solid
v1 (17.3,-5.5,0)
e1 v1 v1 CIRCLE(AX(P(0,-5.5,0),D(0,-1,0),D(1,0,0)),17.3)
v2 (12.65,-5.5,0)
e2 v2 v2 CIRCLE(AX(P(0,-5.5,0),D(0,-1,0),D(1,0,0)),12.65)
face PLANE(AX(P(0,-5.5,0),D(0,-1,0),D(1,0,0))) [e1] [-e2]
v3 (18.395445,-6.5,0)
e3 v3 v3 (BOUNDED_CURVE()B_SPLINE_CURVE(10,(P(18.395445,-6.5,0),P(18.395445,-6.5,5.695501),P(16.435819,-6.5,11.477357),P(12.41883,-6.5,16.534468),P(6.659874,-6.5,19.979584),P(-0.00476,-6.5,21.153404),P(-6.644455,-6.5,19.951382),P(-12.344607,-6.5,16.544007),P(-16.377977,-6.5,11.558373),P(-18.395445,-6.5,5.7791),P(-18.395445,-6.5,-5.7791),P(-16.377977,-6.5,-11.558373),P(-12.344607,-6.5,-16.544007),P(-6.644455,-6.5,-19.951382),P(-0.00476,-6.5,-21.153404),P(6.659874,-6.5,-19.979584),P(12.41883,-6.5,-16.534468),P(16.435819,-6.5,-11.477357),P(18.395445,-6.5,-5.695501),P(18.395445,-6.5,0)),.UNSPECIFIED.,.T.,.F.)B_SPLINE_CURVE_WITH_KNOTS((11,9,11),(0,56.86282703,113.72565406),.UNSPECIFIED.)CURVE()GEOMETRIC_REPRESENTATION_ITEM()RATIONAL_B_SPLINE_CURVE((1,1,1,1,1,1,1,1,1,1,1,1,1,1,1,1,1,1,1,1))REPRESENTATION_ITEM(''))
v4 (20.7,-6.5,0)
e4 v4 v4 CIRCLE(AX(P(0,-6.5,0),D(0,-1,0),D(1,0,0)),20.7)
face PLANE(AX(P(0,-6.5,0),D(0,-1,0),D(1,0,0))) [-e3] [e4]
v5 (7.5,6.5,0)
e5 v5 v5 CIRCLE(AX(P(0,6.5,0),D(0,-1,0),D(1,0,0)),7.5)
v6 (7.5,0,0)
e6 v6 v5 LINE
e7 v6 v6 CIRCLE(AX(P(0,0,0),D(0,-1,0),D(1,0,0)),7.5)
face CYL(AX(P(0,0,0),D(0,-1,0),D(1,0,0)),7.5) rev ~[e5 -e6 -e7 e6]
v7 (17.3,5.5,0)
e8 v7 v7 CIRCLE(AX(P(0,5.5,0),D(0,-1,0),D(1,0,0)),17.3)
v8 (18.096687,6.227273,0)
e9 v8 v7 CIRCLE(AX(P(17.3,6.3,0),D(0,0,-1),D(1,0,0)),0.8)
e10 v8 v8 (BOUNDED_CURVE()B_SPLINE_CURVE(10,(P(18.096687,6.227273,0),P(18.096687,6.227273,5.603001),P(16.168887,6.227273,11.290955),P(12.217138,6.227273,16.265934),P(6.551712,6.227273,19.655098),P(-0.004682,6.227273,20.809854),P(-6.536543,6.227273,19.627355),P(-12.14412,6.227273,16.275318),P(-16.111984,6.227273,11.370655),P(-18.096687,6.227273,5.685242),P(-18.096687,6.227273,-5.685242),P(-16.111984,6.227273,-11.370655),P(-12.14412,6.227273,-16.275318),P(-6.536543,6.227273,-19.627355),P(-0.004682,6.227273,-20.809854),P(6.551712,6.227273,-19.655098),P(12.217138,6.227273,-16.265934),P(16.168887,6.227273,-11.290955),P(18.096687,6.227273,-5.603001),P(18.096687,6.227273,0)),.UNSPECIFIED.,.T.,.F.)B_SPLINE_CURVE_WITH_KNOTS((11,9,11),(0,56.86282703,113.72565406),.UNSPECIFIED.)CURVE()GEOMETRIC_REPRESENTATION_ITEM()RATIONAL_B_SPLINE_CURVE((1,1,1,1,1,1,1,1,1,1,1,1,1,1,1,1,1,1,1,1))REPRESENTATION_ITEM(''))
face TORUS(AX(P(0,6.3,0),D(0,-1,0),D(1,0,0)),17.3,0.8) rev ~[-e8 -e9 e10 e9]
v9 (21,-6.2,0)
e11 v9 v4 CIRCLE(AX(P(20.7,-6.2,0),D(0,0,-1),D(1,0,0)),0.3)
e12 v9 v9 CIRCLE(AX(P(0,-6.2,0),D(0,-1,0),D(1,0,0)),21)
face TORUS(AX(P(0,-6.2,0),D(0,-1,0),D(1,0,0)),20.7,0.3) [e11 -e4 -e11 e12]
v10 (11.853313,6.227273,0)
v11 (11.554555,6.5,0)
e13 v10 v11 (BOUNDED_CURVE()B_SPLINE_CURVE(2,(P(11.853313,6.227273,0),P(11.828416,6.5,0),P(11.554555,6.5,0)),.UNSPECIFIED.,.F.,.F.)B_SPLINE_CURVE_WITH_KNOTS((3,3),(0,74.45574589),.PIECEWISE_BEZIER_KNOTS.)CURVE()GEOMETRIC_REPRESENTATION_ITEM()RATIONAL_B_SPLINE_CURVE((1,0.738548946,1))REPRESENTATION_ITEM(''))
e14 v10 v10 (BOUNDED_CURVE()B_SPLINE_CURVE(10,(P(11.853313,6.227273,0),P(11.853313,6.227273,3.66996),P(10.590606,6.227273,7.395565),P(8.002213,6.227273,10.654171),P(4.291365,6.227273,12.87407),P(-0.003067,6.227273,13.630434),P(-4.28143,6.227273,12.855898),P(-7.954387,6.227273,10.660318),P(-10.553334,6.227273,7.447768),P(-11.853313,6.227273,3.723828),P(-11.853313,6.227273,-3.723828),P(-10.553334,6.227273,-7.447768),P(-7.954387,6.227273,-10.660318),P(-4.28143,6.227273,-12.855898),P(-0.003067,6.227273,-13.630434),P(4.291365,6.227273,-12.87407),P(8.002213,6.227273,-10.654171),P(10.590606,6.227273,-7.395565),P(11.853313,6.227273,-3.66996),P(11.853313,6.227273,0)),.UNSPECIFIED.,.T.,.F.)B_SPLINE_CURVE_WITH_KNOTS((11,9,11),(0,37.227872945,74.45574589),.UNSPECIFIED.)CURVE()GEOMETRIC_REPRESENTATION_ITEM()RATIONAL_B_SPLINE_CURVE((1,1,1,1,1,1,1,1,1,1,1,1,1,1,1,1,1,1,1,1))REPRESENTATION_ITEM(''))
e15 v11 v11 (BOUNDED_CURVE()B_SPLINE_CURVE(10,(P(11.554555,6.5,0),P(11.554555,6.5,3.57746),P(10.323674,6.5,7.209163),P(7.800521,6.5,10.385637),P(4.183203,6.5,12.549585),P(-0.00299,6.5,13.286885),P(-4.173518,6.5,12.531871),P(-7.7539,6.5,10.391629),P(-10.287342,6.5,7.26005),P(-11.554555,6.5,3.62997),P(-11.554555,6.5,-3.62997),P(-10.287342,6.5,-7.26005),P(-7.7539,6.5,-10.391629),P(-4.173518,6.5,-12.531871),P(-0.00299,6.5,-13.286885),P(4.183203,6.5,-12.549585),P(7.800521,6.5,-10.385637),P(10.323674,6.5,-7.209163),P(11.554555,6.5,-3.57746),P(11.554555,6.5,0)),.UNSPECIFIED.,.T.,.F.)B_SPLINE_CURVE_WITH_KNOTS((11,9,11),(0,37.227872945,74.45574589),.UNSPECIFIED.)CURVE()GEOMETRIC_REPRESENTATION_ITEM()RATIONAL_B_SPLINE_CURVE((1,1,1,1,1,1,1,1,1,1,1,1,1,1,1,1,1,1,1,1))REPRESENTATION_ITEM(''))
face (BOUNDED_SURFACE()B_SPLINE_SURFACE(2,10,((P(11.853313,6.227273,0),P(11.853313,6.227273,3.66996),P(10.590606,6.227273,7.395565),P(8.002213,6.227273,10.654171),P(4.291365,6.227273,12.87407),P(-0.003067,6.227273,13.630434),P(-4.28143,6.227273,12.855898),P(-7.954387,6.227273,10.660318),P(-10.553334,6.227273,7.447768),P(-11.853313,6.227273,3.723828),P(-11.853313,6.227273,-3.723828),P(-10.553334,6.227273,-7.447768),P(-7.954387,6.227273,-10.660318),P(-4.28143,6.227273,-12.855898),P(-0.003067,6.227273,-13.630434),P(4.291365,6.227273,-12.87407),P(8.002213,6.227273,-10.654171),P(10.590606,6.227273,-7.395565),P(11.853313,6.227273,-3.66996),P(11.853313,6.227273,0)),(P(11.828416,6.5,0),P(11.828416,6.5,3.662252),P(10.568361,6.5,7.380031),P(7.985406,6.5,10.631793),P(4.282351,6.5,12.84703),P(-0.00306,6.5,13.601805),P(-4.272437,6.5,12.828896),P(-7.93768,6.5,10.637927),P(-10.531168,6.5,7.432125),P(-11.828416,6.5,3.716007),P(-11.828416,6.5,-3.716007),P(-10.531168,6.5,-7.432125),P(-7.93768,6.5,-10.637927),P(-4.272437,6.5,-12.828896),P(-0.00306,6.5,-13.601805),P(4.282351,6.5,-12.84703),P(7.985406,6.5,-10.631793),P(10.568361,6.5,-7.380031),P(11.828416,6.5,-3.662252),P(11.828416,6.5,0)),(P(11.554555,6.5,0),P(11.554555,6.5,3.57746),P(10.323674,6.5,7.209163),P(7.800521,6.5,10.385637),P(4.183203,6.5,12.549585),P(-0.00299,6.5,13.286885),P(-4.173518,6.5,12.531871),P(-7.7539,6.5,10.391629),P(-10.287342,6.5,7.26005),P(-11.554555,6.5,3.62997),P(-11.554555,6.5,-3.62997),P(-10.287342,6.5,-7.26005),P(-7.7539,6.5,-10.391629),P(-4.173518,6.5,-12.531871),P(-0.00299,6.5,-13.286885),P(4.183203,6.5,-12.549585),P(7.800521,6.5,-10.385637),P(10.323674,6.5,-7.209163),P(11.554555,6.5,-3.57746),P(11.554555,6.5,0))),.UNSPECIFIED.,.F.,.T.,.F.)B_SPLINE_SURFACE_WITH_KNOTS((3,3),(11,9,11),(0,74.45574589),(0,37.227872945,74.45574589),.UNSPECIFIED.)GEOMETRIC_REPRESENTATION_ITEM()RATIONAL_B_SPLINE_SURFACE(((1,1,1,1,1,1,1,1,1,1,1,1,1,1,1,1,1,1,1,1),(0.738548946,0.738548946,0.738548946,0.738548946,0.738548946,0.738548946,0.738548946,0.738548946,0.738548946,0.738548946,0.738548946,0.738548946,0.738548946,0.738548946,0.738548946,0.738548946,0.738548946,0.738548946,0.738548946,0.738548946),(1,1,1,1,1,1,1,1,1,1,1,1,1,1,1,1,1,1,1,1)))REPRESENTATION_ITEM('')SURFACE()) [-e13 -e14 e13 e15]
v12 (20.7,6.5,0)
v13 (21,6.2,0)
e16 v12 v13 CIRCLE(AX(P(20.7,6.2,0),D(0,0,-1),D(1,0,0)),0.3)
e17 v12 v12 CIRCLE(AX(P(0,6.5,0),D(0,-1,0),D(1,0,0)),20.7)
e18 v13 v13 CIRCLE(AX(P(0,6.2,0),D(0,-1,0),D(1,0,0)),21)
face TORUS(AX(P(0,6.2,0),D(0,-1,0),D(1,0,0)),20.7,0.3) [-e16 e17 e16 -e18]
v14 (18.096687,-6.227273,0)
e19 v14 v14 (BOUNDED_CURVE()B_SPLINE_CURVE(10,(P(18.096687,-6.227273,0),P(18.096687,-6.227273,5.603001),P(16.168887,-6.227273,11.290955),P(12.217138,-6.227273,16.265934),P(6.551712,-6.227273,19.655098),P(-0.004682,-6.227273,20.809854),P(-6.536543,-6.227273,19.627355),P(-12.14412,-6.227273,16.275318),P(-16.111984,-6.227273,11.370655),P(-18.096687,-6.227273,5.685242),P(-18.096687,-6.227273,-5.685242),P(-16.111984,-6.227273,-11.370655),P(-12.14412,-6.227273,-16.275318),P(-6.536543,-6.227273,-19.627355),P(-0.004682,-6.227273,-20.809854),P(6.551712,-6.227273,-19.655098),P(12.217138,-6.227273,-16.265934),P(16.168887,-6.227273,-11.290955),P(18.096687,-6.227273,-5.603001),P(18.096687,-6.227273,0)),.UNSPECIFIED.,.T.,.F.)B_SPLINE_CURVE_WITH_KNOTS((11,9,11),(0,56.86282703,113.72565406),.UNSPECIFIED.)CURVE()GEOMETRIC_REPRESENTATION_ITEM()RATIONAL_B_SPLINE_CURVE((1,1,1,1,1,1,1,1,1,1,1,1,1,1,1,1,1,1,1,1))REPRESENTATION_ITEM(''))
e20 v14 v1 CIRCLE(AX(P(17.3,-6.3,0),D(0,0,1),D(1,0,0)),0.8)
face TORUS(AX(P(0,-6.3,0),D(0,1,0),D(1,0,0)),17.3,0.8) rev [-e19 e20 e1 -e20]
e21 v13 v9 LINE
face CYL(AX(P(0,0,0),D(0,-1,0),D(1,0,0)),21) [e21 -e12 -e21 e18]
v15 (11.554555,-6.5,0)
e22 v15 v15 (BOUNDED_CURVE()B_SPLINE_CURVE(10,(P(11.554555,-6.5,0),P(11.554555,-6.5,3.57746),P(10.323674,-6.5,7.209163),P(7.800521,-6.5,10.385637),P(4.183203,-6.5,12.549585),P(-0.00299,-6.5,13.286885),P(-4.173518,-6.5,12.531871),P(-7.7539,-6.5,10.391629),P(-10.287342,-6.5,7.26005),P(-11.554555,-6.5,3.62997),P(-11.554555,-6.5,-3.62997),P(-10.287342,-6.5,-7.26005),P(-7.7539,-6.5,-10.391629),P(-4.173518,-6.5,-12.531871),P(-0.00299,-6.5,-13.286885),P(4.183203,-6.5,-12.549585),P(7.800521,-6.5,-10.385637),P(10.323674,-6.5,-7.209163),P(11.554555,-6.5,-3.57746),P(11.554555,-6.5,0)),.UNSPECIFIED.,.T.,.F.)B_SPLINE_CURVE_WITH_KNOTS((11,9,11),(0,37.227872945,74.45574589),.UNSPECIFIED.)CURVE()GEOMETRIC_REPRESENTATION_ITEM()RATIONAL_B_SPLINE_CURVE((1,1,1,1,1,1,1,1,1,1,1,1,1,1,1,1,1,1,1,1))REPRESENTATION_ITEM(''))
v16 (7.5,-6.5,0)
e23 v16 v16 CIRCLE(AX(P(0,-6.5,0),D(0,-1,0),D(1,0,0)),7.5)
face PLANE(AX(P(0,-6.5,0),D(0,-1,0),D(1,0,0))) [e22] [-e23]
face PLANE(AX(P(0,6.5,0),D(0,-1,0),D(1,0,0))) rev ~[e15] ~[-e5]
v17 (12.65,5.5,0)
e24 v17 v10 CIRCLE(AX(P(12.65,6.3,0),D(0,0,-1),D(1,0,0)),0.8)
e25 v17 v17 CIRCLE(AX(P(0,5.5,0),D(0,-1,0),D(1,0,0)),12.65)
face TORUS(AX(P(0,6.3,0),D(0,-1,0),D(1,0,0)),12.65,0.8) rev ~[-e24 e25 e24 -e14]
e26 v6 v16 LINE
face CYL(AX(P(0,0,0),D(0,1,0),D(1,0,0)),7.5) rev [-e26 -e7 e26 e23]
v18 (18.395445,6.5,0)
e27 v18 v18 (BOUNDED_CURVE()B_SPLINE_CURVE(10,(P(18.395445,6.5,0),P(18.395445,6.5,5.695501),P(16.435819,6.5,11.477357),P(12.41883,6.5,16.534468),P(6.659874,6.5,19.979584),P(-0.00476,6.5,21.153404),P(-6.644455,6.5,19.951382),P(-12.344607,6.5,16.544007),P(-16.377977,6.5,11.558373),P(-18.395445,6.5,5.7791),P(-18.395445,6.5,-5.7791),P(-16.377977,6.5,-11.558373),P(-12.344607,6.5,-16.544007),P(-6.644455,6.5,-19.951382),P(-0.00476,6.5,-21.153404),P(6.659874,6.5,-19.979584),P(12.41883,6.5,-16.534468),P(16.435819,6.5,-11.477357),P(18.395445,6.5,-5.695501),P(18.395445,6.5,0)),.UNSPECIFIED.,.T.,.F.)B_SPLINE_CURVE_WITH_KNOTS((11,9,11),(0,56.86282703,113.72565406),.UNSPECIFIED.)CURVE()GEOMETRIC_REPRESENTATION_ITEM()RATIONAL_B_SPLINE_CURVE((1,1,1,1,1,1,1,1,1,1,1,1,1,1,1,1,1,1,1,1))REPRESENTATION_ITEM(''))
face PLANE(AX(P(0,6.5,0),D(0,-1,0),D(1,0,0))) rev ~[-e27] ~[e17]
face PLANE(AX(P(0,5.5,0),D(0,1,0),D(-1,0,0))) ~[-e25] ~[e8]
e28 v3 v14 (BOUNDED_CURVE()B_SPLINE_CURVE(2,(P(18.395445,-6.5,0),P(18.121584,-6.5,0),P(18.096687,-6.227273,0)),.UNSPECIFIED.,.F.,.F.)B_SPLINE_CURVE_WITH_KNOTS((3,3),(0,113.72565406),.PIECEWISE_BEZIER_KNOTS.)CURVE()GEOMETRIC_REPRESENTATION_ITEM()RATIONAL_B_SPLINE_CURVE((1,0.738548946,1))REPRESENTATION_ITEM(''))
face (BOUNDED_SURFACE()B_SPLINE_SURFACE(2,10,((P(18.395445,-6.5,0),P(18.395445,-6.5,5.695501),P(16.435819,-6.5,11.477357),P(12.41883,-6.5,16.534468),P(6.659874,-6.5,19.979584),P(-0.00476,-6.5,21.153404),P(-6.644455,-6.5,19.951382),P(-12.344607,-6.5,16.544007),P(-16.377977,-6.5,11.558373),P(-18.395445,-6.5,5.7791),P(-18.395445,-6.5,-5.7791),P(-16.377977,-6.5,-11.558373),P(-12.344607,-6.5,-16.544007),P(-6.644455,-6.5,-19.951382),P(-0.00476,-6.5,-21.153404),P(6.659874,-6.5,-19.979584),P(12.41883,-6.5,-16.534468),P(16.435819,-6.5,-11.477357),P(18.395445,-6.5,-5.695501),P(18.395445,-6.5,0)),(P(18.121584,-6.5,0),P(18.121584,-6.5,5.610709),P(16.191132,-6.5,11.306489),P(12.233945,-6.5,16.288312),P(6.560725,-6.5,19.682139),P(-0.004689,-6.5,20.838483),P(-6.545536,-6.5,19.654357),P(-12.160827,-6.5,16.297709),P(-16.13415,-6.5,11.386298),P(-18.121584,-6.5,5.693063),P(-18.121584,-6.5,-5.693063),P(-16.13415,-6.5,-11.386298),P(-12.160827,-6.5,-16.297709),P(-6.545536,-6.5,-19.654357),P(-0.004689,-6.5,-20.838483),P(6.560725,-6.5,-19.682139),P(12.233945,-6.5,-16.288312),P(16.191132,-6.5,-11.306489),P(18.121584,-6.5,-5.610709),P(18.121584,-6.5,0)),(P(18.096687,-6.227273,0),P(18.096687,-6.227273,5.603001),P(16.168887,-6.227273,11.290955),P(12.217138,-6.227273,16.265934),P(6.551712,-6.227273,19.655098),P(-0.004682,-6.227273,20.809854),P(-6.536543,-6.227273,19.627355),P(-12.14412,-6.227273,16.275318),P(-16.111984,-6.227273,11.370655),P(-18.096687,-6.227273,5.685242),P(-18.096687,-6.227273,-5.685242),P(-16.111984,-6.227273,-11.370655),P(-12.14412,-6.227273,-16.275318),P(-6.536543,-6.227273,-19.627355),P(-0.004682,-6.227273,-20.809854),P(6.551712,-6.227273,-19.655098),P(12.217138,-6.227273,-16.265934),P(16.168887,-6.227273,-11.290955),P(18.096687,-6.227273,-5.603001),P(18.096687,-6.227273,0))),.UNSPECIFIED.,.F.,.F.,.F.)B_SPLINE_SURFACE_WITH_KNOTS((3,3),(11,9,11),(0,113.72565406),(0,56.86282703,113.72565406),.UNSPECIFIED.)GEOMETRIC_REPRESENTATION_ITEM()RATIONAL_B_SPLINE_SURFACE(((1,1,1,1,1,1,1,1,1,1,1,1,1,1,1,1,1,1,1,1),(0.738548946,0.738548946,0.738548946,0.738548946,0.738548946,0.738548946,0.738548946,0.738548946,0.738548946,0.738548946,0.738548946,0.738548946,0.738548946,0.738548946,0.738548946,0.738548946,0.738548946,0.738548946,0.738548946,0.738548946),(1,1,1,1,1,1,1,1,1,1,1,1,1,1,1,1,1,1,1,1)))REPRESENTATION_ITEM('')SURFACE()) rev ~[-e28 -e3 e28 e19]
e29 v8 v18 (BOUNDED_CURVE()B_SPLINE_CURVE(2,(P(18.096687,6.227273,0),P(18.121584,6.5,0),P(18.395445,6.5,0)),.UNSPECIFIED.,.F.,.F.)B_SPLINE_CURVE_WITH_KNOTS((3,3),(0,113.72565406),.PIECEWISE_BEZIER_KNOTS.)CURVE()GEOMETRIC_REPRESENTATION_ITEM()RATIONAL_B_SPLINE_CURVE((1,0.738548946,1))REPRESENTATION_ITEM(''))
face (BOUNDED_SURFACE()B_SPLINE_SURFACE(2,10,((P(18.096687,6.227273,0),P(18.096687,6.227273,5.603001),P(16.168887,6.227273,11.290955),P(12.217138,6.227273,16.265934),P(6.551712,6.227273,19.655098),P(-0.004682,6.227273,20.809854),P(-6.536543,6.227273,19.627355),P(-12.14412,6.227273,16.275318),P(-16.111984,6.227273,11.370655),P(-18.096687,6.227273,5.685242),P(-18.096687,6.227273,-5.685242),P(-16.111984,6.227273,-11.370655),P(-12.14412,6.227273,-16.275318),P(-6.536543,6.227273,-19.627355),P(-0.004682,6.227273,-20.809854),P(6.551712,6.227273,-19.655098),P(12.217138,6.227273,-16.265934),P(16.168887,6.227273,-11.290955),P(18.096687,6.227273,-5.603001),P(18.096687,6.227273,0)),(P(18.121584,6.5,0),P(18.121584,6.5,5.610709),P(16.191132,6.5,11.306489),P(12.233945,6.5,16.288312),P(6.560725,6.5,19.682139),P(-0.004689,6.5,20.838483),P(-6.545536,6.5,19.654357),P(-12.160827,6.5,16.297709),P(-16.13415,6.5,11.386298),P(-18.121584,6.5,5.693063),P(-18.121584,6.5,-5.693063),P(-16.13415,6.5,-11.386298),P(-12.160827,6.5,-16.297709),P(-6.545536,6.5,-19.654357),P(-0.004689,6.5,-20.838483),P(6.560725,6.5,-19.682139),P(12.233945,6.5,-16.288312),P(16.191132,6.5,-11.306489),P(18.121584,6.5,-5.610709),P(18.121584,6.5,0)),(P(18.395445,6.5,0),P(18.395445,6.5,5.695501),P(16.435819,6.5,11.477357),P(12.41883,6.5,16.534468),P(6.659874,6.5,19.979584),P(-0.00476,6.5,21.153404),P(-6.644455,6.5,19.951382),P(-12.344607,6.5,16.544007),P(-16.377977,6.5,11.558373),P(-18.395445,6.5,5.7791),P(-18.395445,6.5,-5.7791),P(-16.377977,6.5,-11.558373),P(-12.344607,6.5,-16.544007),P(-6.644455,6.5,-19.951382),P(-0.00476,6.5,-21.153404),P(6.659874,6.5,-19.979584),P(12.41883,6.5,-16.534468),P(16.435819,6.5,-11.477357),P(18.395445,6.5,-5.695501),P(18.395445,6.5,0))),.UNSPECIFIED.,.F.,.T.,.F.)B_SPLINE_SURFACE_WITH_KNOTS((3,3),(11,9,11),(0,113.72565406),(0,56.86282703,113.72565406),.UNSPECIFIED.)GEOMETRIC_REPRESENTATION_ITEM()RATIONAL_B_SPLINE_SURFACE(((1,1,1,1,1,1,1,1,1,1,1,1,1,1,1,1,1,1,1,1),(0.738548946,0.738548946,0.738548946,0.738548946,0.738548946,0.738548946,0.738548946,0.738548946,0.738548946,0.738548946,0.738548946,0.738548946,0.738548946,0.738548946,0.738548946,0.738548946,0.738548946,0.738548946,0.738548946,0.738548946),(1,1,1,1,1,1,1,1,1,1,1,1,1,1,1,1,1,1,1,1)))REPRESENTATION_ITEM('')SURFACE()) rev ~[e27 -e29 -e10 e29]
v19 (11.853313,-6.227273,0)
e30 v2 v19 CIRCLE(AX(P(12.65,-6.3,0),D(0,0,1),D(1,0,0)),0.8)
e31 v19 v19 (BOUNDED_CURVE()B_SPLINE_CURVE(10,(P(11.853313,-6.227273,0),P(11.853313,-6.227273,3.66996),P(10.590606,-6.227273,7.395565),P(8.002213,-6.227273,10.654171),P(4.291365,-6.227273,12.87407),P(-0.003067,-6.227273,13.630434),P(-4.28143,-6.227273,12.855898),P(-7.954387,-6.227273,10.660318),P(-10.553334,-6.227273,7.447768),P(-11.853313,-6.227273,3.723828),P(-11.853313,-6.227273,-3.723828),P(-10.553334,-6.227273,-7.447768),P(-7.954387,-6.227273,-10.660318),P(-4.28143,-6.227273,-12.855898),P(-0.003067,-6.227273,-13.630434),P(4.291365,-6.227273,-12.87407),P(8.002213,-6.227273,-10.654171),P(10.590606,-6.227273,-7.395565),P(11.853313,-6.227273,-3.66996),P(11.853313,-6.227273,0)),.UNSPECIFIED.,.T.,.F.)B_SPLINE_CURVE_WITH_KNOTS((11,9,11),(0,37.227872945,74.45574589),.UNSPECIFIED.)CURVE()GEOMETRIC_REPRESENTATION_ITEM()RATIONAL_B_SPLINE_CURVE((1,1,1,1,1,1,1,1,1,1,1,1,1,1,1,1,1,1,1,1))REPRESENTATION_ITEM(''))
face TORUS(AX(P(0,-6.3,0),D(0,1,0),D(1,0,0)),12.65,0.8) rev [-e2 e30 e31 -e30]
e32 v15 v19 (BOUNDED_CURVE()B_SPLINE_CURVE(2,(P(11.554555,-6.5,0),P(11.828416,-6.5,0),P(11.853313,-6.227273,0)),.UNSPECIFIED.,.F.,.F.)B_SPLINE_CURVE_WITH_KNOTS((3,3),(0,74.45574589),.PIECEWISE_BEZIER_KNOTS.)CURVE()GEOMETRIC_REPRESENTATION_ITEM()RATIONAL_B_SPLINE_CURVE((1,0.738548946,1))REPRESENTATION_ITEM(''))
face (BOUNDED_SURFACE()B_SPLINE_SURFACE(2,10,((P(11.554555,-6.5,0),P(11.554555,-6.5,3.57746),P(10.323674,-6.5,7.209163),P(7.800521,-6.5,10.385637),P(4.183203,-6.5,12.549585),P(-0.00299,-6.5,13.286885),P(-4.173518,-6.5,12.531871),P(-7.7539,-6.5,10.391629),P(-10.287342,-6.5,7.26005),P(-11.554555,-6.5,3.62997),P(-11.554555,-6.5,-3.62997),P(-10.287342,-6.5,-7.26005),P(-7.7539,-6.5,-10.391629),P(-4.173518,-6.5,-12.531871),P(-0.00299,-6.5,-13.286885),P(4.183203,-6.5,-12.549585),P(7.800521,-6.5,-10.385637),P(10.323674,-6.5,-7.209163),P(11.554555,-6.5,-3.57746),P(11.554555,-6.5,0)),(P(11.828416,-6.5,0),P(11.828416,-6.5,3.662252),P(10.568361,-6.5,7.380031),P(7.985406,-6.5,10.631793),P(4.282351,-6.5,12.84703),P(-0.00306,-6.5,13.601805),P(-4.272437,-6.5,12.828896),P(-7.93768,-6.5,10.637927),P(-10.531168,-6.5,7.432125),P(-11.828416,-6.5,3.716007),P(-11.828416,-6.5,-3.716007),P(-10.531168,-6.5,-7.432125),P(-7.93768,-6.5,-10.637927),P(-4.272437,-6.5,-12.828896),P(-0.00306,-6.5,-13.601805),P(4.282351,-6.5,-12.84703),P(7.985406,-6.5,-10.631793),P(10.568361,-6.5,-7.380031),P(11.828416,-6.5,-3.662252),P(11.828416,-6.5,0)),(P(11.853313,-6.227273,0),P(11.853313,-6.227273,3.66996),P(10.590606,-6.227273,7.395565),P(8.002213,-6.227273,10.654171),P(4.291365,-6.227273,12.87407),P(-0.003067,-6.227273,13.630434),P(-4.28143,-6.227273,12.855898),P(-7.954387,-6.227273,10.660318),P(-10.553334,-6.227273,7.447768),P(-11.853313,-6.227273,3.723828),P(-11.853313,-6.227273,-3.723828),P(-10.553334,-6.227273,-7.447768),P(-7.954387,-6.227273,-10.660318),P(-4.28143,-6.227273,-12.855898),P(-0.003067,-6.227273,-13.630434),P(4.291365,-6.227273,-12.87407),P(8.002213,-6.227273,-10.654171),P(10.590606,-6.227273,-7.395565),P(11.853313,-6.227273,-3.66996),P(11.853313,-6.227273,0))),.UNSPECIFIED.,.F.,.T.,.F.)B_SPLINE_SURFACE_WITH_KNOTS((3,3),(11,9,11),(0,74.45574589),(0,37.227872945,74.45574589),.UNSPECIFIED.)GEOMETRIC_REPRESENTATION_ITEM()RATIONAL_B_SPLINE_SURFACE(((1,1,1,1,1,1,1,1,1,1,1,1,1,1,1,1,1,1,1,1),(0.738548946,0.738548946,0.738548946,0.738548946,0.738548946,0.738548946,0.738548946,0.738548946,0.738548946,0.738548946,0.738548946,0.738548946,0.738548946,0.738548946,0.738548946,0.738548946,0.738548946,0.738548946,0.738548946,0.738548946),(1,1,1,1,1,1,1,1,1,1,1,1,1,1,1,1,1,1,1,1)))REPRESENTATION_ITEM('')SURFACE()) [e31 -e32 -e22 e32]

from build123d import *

# Parameters (mm, degrees)
F0_R          = 21
F0_R_2        = 7.5
F1_DEPTH      = 6.5
F1_DEPTH_BACK = 6.5
F2_R          = 18.1
F2_R_2        = 11.85
F3_DEPTH      = 1
F4_R          = 0.8
F5_R          = 0.3


# Not quite as in the source:
# - a pattern or mirror of a feature is missing from the dataset's text; its kind, count and spacing are read off the source's solid


with BuildPart() as f1:
    # F0 (on Front) → F1 (new body, two sides)
    with BuildSketch(Plane.XZ) as f1_sk:
        Circle(F0_R)
        Circle(F0_R_2, mode=Mode.SUBTRACT)
    extrude(amount=F1_DEPTH)
    extrude(f1_sk.sketch, amount=-F1_DEPTH_BACK)

    # F2 (on face) → F3 (cut)
    with BuildSketch(Plane.XZ.offset(6.5)):
        Circle(F2_R)
        Circle(F2_R_2, mode=Mode.SUBTRACT)
    f3 = extrude(amount=-F3_DEPTH, mode=Mode.SUBTRACT)

    # F3_copies: F3 across plane
    add(f3.mirror(Plane.ZX), mode=Mode.SUBTRACT)

    # F4
    f4_edges = [f1.edges().sort_by_distance(p)[0] for p in [
        (-11.85, -5.5, 0),
        (-18.1, -5.5, 0),
        (-18.1, 5.5, 0),
        (-11.85, 5.5, 0),
    ]]
    fillet(f4_edges, radius=F4_R)

    # F5
    f5_edges = [f1.edges().sort_by_distance(p)[0] for p in [
        (-18.1, -6.5, 0),
        (-21, -6.5, 0),
        (-11.85, -6.5, 0),
        (-21, 6.5, 0),
        (-18.1, 6.5, 0),
        (-11.85, 6.5, 0),
    ]]
    fillet(f5_edges, radius=F5_R)


solid = f1.part
